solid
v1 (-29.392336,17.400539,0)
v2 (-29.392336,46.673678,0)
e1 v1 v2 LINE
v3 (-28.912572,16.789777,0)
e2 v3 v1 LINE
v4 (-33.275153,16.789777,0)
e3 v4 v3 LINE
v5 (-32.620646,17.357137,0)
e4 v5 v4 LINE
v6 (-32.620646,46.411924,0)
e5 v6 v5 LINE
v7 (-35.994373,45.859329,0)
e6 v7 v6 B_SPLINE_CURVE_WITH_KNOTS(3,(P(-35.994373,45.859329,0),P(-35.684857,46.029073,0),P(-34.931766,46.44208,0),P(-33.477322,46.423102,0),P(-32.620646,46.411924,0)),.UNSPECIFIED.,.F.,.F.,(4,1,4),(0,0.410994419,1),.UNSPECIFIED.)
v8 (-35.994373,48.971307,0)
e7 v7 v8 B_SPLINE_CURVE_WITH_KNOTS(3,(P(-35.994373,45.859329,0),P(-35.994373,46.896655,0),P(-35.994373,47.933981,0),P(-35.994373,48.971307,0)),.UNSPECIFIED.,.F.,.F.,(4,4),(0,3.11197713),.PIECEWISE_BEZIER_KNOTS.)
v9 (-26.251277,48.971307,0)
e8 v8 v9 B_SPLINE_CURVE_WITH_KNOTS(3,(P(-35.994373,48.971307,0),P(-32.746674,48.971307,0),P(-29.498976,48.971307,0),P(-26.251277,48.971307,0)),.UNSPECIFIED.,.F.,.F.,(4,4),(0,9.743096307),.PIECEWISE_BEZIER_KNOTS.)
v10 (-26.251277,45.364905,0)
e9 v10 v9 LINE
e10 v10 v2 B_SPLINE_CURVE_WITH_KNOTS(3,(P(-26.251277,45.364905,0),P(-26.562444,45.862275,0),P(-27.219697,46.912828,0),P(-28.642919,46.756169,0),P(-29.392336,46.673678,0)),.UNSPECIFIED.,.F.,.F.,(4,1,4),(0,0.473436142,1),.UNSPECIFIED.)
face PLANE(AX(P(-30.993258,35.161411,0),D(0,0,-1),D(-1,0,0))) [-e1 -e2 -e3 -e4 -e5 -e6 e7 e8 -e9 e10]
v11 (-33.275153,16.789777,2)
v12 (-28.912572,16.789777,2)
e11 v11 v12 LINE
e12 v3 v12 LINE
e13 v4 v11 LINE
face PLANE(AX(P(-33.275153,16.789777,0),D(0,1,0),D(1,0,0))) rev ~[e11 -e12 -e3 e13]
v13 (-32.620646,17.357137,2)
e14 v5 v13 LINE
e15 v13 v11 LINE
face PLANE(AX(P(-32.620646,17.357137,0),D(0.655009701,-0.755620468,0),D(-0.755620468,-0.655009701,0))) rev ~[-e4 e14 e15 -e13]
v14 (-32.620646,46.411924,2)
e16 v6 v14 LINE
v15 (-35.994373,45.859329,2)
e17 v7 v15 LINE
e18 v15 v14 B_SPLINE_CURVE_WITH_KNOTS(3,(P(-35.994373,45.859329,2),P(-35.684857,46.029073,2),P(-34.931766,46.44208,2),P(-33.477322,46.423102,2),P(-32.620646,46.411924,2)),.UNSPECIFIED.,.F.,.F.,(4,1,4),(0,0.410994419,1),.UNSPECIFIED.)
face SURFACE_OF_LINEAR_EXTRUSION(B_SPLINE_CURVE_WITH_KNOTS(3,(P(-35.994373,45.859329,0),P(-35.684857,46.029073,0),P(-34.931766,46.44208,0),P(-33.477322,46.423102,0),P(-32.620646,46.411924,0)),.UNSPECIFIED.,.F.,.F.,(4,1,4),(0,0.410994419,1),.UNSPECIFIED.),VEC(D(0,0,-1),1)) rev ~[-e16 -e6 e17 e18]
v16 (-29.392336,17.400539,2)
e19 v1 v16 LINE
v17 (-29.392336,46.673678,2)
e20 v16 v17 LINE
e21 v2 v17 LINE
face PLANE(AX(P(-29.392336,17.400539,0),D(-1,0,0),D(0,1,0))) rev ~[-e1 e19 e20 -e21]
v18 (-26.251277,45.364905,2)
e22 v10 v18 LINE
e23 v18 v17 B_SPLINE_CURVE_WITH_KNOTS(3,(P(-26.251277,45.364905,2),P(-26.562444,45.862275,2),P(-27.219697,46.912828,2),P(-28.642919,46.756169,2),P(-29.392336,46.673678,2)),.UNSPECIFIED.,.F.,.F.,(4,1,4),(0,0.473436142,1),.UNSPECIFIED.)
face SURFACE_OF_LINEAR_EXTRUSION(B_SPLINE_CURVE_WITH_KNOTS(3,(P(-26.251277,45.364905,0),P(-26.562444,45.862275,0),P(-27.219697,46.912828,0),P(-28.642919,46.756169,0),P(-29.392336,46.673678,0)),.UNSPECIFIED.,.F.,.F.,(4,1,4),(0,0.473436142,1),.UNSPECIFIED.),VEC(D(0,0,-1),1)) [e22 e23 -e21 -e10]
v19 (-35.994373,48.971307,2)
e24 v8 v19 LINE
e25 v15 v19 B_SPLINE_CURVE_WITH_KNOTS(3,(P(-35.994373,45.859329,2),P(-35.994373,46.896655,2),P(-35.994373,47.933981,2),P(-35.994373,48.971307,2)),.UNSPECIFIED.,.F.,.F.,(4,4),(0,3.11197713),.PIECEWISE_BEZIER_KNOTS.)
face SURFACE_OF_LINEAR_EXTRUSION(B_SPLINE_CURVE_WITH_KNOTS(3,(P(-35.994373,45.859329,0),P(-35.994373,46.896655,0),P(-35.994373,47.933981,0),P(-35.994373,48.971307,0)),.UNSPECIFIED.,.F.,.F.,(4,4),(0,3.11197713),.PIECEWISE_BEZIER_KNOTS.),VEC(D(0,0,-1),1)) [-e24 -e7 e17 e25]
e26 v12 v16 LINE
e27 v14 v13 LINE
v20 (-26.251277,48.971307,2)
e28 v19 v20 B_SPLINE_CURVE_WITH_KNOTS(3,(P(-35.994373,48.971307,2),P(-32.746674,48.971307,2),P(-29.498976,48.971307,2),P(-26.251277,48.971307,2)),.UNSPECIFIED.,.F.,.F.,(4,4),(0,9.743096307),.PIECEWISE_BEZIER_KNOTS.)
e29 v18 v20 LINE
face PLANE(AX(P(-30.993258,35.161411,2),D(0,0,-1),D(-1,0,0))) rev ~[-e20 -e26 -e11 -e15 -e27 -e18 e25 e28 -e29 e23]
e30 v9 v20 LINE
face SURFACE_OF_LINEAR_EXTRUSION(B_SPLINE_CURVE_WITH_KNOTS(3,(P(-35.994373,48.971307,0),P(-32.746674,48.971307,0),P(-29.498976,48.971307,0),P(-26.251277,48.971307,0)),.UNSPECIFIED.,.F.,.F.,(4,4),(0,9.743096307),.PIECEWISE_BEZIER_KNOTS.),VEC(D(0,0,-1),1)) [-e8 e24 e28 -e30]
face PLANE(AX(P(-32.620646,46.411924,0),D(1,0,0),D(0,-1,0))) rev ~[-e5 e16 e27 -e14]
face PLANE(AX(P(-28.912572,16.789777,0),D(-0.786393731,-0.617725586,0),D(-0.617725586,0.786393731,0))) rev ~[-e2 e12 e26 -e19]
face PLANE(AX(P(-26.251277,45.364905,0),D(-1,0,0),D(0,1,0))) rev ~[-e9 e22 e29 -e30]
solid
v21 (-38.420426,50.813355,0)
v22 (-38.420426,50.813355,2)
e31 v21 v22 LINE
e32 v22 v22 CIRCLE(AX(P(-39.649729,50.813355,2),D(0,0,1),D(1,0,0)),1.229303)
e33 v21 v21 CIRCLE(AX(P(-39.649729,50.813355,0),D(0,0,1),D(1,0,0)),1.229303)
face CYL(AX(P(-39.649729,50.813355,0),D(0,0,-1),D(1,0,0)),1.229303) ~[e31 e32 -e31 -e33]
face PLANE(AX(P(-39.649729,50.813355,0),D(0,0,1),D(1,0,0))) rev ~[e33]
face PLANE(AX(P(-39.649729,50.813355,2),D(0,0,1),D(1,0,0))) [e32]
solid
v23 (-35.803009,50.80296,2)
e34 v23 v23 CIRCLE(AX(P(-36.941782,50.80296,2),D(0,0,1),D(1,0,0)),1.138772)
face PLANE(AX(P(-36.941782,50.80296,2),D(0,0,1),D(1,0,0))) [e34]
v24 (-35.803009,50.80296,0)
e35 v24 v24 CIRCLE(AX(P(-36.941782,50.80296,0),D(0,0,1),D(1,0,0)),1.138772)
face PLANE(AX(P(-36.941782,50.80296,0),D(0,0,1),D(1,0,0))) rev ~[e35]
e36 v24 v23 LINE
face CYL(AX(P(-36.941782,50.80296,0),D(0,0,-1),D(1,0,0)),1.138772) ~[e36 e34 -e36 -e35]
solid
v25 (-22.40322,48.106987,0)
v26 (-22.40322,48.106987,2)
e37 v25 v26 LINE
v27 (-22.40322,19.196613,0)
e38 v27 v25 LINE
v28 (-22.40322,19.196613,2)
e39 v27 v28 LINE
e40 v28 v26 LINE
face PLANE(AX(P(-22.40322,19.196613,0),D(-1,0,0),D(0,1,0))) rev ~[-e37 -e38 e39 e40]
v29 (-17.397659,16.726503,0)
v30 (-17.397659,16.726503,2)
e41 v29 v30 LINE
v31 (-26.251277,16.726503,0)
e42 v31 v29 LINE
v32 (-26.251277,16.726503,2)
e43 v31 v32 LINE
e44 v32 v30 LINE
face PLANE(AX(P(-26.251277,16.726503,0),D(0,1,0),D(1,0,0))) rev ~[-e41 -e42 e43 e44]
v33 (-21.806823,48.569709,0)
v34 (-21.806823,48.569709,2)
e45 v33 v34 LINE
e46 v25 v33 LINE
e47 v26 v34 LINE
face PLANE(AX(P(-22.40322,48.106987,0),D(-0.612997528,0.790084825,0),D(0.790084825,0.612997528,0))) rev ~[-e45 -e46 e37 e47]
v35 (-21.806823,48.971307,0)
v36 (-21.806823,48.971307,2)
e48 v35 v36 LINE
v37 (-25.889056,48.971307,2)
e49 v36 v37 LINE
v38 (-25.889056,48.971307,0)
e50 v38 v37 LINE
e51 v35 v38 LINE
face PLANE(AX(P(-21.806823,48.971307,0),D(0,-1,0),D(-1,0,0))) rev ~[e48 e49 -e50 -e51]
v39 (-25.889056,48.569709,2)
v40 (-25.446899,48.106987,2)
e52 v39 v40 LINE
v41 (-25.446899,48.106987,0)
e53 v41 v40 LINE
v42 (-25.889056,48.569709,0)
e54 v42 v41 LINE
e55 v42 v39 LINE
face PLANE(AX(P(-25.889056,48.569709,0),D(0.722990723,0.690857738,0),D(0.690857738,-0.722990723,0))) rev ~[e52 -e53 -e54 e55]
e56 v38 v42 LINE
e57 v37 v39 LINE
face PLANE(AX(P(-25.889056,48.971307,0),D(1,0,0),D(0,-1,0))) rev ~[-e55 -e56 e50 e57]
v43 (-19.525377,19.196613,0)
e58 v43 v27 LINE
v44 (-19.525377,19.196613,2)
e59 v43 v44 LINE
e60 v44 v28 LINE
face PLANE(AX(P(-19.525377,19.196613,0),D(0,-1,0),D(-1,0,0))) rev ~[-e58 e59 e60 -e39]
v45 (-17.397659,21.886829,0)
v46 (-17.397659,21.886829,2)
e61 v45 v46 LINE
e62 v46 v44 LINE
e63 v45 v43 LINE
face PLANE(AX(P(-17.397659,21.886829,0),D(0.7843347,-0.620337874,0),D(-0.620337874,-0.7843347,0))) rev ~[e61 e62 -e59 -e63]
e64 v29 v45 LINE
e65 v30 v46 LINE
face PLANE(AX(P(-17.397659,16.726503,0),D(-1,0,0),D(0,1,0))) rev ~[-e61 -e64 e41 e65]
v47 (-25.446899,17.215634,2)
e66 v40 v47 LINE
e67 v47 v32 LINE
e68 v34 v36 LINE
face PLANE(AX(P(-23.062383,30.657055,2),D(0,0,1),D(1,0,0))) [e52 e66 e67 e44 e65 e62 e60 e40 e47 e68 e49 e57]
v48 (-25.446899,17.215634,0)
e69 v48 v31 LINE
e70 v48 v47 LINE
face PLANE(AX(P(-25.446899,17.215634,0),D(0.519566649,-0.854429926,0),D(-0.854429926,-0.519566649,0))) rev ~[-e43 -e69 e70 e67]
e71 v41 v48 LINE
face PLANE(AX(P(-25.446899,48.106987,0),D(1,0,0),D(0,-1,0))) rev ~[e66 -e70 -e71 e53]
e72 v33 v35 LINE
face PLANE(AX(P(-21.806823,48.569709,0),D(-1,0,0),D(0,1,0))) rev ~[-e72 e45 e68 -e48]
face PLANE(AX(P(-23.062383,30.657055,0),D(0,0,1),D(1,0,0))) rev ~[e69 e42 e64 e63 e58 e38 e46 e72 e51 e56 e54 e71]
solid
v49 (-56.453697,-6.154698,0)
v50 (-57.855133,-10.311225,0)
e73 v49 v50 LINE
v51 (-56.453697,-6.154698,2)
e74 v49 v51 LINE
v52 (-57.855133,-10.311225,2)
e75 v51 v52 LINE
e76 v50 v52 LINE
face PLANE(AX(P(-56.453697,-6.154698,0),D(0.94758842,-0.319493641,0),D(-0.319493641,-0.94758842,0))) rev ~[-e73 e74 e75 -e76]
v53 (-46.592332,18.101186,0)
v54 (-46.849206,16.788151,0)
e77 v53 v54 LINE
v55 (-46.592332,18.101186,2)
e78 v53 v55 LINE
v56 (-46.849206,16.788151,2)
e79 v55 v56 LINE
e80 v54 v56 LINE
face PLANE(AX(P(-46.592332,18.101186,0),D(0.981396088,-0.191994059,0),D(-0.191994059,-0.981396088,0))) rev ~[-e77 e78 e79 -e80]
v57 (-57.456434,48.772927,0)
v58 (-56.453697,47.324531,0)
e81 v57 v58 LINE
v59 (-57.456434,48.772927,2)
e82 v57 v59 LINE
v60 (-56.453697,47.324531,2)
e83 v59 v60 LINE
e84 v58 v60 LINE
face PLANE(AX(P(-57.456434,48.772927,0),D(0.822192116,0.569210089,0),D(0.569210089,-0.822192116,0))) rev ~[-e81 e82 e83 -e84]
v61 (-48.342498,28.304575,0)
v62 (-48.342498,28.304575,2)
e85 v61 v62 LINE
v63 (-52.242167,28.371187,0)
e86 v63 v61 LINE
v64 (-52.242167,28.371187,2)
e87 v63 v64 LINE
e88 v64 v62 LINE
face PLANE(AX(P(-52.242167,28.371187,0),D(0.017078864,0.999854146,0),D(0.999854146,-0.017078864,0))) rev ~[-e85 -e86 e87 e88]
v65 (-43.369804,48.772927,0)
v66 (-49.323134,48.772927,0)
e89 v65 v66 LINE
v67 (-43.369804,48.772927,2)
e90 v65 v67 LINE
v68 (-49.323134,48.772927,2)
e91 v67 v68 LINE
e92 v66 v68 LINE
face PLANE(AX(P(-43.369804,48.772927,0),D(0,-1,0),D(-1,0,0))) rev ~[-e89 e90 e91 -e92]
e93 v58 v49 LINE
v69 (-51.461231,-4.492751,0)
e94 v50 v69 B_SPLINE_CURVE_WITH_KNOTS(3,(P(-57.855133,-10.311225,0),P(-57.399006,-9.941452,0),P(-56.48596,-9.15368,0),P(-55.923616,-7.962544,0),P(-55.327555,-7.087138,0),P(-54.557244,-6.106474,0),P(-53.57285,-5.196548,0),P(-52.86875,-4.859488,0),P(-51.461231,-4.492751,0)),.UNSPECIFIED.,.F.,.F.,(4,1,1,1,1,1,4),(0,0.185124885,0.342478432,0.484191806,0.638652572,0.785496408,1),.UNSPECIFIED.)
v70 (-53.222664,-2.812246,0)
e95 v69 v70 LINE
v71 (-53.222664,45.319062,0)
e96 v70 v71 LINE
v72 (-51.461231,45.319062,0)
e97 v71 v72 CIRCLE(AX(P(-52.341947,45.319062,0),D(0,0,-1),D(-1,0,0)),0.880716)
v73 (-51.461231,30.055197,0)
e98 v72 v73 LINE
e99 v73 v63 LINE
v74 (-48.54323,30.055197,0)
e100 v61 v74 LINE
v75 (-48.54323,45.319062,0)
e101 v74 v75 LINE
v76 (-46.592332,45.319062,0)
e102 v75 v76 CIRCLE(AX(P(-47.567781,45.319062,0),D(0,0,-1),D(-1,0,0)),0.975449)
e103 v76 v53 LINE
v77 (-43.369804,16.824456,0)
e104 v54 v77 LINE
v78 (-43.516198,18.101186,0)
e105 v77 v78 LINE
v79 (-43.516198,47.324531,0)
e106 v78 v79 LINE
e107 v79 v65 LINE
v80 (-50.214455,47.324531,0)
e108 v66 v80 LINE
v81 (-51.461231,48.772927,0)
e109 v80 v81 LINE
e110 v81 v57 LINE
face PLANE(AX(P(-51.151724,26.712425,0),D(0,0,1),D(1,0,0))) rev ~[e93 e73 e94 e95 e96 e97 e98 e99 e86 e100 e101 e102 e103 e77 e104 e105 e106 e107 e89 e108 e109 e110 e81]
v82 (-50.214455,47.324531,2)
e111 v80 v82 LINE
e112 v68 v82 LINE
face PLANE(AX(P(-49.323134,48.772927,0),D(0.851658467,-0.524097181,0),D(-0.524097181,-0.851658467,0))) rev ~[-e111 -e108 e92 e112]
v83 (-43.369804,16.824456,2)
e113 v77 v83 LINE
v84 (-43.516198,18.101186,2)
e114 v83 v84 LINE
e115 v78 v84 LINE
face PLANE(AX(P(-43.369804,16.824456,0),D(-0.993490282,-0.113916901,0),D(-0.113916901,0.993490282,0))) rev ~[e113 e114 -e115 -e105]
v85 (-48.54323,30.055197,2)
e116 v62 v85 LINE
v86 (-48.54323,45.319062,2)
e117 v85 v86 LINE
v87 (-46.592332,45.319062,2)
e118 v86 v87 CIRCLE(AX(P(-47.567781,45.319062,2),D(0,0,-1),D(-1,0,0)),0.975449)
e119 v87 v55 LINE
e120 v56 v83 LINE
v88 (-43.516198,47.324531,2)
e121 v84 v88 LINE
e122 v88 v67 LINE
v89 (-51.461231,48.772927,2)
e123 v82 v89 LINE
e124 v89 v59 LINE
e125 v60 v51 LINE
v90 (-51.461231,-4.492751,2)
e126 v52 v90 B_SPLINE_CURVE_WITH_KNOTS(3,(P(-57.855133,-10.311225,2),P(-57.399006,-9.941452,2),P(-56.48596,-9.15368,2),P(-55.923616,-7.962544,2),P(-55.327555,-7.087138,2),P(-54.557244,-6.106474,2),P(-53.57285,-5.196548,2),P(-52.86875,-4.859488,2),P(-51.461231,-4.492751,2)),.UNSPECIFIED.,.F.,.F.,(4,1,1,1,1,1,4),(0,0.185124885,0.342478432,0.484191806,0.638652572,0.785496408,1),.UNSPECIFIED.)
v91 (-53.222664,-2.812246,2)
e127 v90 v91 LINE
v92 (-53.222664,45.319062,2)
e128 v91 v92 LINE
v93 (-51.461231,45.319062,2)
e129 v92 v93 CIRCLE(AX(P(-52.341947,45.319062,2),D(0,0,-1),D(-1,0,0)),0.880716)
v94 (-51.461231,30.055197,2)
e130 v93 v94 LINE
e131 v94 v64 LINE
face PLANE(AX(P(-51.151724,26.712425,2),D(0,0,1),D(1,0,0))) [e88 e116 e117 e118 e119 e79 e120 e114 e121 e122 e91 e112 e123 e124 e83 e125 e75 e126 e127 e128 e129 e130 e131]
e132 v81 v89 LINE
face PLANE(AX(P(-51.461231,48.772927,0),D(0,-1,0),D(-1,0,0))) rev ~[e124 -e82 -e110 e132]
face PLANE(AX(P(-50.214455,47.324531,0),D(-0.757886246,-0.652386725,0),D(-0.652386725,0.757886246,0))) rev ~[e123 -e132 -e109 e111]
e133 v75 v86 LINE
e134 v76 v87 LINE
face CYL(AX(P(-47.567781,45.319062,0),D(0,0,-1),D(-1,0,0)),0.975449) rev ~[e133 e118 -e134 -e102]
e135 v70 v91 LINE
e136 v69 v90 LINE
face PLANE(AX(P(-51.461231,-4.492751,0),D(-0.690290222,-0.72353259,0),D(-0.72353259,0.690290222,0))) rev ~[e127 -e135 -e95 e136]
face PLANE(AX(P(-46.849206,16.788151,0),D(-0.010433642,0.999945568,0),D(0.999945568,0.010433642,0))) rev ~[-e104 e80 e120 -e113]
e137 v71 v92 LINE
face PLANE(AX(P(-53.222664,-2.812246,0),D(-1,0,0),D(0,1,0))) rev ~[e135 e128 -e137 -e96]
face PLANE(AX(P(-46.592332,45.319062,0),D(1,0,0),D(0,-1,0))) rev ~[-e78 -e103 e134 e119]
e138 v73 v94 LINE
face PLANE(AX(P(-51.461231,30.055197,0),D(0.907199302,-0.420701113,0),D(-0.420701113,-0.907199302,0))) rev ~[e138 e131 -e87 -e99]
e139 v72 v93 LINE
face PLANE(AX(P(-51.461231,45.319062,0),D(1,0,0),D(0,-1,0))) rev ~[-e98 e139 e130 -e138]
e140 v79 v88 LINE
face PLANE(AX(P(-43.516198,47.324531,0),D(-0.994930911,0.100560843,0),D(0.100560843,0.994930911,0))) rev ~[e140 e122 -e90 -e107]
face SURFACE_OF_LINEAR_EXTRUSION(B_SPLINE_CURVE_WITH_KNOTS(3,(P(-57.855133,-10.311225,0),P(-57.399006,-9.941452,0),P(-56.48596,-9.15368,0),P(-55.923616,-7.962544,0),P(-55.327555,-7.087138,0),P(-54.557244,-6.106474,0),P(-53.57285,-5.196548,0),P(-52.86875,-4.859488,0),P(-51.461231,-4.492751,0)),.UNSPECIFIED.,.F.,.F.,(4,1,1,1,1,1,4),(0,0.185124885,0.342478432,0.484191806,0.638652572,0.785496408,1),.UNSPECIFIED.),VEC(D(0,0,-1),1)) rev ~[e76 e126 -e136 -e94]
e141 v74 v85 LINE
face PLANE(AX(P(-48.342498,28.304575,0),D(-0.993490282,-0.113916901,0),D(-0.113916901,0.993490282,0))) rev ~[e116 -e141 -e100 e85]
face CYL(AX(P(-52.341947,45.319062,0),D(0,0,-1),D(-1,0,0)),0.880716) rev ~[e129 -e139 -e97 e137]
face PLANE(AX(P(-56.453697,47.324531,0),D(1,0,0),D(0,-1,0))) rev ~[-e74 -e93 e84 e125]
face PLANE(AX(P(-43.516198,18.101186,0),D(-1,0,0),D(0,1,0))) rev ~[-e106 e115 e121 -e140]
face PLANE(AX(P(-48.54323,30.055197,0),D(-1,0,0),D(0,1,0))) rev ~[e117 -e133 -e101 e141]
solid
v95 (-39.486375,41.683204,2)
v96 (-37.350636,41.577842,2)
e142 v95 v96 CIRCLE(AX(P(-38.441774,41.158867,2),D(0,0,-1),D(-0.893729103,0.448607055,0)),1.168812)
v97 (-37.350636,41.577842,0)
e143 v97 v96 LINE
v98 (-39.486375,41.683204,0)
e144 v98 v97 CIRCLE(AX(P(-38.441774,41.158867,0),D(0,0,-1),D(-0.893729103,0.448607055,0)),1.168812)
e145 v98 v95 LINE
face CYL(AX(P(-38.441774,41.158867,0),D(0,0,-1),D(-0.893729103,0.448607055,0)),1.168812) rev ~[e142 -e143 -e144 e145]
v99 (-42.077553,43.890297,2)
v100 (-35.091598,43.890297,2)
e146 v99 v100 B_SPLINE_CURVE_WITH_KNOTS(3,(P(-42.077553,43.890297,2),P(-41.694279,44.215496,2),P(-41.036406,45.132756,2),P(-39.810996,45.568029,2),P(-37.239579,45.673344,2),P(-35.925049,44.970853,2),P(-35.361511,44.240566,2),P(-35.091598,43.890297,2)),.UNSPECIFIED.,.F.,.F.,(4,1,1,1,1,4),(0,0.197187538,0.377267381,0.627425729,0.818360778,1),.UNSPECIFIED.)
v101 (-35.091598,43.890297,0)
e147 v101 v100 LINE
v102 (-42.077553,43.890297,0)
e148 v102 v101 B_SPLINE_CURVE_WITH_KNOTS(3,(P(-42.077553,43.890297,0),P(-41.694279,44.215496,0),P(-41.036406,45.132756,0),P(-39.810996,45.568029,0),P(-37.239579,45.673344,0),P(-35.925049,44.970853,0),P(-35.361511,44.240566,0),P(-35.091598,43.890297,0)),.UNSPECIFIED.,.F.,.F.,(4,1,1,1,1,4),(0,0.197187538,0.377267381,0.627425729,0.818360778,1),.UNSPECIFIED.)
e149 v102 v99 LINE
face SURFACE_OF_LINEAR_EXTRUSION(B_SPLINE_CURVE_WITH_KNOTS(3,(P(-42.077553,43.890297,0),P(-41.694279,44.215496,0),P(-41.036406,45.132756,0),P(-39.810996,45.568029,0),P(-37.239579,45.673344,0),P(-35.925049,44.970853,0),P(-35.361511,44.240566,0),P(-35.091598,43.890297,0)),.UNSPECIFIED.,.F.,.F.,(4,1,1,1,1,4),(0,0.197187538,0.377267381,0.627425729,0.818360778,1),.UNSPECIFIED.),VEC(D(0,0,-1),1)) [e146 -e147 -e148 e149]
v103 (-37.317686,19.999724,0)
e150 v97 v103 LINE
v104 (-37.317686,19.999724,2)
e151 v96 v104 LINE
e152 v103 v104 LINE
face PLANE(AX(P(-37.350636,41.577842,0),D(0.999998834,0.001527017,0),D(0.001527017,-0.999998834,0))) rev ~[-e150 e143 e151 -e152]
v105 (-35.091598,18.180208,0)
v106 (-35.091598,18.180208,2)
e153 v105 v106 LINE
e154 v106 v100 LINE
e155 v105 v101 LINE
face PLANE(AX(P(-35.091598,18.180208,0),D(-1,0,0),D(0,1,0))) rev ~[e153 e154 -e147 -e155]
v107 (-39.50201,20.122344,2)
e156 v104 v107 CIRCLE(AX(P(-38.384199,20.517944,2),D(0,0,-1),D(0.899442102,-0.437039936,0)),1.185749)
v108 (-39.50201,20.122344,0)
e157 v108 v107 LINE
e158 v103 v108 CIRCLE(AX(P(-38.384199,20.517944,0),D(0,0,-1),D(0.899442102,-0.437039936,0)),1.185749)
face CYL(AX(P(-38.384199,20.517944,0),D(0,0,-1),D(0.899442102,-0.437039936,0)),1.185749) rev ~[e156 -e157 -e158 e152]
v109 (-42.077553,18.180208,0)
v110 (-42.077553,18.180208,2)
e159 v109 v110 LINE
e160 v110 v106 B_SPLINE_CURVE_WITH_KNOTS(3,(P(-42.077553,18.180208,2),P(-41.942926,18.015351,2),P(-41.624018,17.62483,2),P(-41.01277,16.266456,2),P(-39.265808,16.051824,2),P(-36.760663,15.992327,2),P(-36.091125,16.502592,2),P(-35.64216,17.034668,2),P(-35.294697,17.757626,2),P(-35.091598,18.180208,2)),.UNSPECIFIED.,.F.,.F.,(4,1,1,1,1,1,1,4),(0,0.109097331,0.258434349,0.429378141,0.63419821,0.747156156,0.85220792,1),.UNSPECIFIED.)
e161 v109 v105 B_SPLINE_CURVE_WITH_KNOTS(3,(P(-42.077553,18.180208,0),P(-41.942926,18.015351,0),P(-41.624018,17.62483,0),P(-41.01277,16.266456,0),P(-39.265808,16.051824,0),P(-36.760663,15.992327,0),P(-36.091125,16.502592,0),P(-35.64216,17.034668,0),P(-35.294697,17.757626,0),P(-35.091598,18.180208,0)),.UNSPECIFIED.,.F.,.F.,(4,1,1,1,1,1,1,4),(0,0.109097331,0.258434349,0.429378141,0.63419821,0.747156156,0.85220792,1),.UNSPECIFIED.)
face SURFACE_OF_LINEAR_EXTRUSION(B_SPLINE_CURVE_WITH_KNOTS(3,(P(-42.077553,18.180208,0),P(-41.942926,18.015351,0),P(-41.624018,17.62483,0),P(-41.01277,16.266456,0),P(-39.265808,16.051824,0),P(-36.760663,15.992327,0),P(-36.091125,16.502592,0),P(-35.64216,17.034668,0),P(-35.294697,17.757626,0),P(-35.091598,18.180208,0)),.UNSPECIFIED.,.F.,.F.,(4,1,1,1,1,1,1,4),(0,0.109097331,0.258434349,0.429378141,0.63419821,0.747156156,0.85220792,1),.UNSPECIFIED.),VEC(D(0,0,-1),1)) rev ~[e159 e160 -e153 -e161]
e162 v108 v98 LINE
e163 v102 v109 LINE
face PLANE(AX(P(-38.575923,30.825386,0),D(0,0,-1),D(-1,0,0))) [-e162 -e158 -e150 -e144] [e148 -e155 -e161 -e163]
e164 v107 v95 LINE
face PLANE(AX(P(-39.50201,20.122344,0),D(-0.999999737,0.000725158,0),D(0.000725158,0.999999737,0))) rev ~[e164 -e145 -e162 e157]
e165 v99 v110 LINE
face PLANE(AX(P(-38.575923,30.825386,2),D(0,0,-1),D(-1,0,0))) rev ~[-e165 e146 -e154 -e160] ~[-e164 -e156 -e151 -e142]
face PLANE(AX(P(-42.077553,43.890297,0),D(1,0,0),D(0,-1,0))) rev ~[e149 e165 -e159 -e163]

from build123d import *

# Parameters (mm, degrees)
F1_DEPTH = 2
F0_R     = 1.2293027529
F0_R_2   = 1.1387722668


with BuildPart() as f1:
    # F0 (on Top) → F1 (new body)
    with BuildSketch(Plane.XY):
        with BuildLine():
            Line((-56.4536973834, -6.1546978541), (-57.8551329672, -10.3112254292))
            add(Edge.make_bspline(
                [(-57.8551329672, -10.3112254292), (-57.3990056054, -9.9414517987), (-56.4859601505, -9.1536799978), (-55.9236162382, -7.9625439336), (-55.3275550964, -7.0871377477), (-54.5572435837, -6.1064735999), (-53.5728500895, -5.1965475686), (-52.8687499464, -4.8594879918), (-51.4612309635, -4.492750857)],
                knots=[0, 0, 0, 0, 0.1851248852, 0.3424784316, 0.4841918055, 0.6386525718, 0.7854964076, 1, 1, 1, 1], degree=3))
            Line((-51.4612309635, -4.492750857), (-53.2226637006, -2.8122463264))
            Line((-53.2226637006, -2.8122463264), (-53.2226637006, 45.3190617263))
            ThreePointArc((-53.2226637006, 45.3190617263), (-52.341947332, 46.1997780949), (-51.4612309635, 45.3190617263))
            Line((-51.4612309635, 45.3190617263), (-51.4612309635, 30.0551969558))
            Line((-51.4612309635, 30.0551969558), (-52.242167294, 28.371186927))
            Line((-52.242167294, 28.371186927), (-48.3424975936, 28.3045752825))
            Line((-48.3424975936, 28.3045752825), (-48.5432296991, 30.0551969558))
            Line((-48.5432296991, 30.0551969558), (-48.5432296991, 45.3190617263))
            ThreePointArc((-48.5432296991, 45.3190617263), (-47.5677810609, 46.2945103645), (-46.5923324227, 45.3190617263))
            Line((-46.5923324227, 45.3190617263), (-46.5923324227, 18.1011855602))
            Line((-46.5923324227, 18.1011855602), (-46.84920609, 16.7881511152))
            Line((-46.84920609, 16.7881511152), (-43.3698035777, 16.8244559318))
            Line((-43.3698035777, 16.8244559318), (-43.5161976447, 18.1011855602))
            Line((-43.5161976447, 18.1011855602), (-43.5161976447, 47.3245307803))
            Line((-43.5161976447, 47.3245307803), (-43.3698035777, 48.7729273736))
            Line((-43.3698035777, 48.7729273736), (-49.3231341243, 48.7729273736))
            Line((-49.3231341243, 48.7729273736), (-50.2144545317, 47.3245307803))
            Line((-50.2144545317, 47.3245307803), (-51.4612309635, 48.7729273736))
            Line((-51.4612309635, 48.7729273736), (-57.456433773, 48.7729273736))
            Line((-57.456433773, 48.7729273736), (-56.4536973834, 47.3245307803))
            Line((-56.4536973834, 47.3245307803), (-56.4536973834, -6.1546978541))
        make_face()
    extrude(amount=F1_DEPTH)


with BuildPart() as f1b:
    # F0 (on Top) → F1, piece 2 (new body)
    with BuildSketch(Plane.XY):
        with BuildLine():
            add(Edge.make_bspline(
                [(-42.0775525272, 43.8902974129), (-41.6942788959, 44.2154963908), (-41.036405557, 45.1327555061), (-39.8109964401, 45.5680290153), (-37.2395787485, 45.6733438975), (-35.9250489528, 44.9708525517), (-35.3615108781, 44.240565625), (-35.0915975869, 43.8902974129)],
                knots=[0, 0, 0, 0, 0.1971875376, 0.3772673806, 0.6274257288, 0.8183607775, 1, 1, 1, 1], degree=3))
            Line((-42.0775525272, 43.8902974129), (-42.0775525272, 18.1802082807))
            add(Edge.make_bspline(
                [(-42.0775525272, 18.1802082807), (-41.9429261615, 18.0153509456), (-41.6240175614, 17.6248299533), (-41.0127698726, 16.2664561335), (-39.2658081646, 16.0518243935), (-36.7606634204, 15.992326804), (-36.0911249212, 16.5025921155), (-35.642160255, 17.0346677821), (-35.2946967023, 17.757625575), (-35.0915975869, 18.1802082807)],
                knots=[0, 0, 0, 0, 0.1090973313, 0.258434349, 0.429378141, 0.6341982103, 0.7471561555, 0.8522079201, 1, 1, 1, 1], degree=3))
            Line((-35.0915975869, 18.1802082807), (-35.0915975869, 43.8902974129))
        make_face()
        with BuildLine():
            ThreePointArc((-39.486374706, 41.6832044721), (-38.3841825965, 42.3262593723), (-37.3506359756, 41.5778420866))
            Line((-37.3506359756, 41.5778420866), (-37.3176857829, 19.9997238815))
            ThreePointArc((-37.3176857829, 19.9997238815), (-38.4506574535, 19.3340583356), (-39.5020097494, 20.1223436743))
            Line((-39.5020097494, 20.1223436743), (-39.486374706, 41.6832044721))
        make_face(mode=Mode.SUBTRACT)
    extrude(amount=F1_DEPTH)


with BuildPart() as f1c:
    # F0 (on Top) → F1, piece 3 (new body)
    with BuildSketch(Plane.XY):
        with Locations((-39.6497291513, 50.8133545518)):
            Circle(F0_R)
    extrude(amount=F1_DEPTH)


with BuildPart() as f1d:
    # F0 (on Top) → F1, piece 4 (new body)
    with BuildSketch(Plane.XY):
        with Locations((-36.9417816401, 50.8029596414)):
            Circle(F0_R_2)
    extrude(amount=F1_DEPTH)


with BuildPart() as f1e:
    # F0 (on Top) → F1, piece 5 (new body)
    with BuildSketch(Plane.XY):
        with BuildLine():
            add(Edge.make_bspline(
                [(-35.9943732619, 45.8593294024), (-35.9943732619, 46.8966551125), (-35.9943732619, 47.9339808226), (-35.9943732619, 48.9713065326)],
                knots=[0, 0, 0, 0, 3.1119771302, 3.1119771302, 3.1119771302, 3.1119771302], degree=3))
            add(Edge.make_bspline(
                [(-35.9943732619, 45.8593294024), (-35.6848569517, 46.0290729346), (-34.9317656783, 46.4420798379), (-33.4773216876, 46.4231020734), (-32.6206460595, 46.4119240642)],
                knots=[0, 0, 0, 0, 0.4109944188, 1, 1, 1, 1], degree=3))
            Line((-32.6206460595, 46.4119240642), (-32.6206460595, 17.3571370542))
            Line((-32.6206460595, 17.3571370542), (-33.2751534879, 16.7897772044))
            Line((-33.2751534879, 16.7897772044), (-28.9125721902, 16.7897772044))
            Line((-28.9125721902, 16.7897772044), (-29.3923355639, 17.4005385488))
            Line((-29.3923355639, 17.4005385488), (-29.3923355639, 46.6736778617))
            add(Edge.make_bspline(
                [(-26.251276955, 45.3649051487), (-26.5624442676, 45.8622749418), (-27.2196972414, 46.9128280121), (-28.642918623, 46.7561688922), (-29.3923355639, 46.6736778617)],
                knots=[0, 0, 0, 0, 0.4734361425, 1, 1, 1, 1], degree=3))
            Line((-26.251276955, 45.3649051487), (-26.251276955, 48.9713065326))
            add(Edge.make_bspline(
                [(-35.9943732619, 48.9713065326), (-32.746674493, 48.9713065326), (-29.498975724, 48.9713065326), (-26.251276955, 48.9713065326)],
                knots=[0, 0, 0, 0, 9.7430963069, 9.7430963069, 9.7430963069, 9.7430963069], degree=3))
        make_face()
    extrude(amount=F1_DEPTH)


with BuildPart() as f1f:
    # F0 (on Top) → F1, piece 6 (new body)
    with BuildSketch(Plane.XY):
        Polygon((-25.8890558034, 48.5697090626), (-25.4468992352, 48.1069870293), (-25.4468992352, 17.2156337649), (-26.251276955, 16.7265031487), (-17.3976588994, 16.7265031487), (-17.3976588994, 21.8868292868), (-19.5253770798, 19.1966127604), (-22.4032197148, 19.1966127604), (-22.4032197148, 48.1069870293), (-21.8068230897, 48.5697090626), (-21.8068230897, 48.9713065326), (-25.8890558034, 48.9713065326), align=None)
    extrude(amount=F1_DEPTH)


solid = Compound([f1.part, f1b.part, f1c.part, f1d.part, f1e.part, f1f.part])
